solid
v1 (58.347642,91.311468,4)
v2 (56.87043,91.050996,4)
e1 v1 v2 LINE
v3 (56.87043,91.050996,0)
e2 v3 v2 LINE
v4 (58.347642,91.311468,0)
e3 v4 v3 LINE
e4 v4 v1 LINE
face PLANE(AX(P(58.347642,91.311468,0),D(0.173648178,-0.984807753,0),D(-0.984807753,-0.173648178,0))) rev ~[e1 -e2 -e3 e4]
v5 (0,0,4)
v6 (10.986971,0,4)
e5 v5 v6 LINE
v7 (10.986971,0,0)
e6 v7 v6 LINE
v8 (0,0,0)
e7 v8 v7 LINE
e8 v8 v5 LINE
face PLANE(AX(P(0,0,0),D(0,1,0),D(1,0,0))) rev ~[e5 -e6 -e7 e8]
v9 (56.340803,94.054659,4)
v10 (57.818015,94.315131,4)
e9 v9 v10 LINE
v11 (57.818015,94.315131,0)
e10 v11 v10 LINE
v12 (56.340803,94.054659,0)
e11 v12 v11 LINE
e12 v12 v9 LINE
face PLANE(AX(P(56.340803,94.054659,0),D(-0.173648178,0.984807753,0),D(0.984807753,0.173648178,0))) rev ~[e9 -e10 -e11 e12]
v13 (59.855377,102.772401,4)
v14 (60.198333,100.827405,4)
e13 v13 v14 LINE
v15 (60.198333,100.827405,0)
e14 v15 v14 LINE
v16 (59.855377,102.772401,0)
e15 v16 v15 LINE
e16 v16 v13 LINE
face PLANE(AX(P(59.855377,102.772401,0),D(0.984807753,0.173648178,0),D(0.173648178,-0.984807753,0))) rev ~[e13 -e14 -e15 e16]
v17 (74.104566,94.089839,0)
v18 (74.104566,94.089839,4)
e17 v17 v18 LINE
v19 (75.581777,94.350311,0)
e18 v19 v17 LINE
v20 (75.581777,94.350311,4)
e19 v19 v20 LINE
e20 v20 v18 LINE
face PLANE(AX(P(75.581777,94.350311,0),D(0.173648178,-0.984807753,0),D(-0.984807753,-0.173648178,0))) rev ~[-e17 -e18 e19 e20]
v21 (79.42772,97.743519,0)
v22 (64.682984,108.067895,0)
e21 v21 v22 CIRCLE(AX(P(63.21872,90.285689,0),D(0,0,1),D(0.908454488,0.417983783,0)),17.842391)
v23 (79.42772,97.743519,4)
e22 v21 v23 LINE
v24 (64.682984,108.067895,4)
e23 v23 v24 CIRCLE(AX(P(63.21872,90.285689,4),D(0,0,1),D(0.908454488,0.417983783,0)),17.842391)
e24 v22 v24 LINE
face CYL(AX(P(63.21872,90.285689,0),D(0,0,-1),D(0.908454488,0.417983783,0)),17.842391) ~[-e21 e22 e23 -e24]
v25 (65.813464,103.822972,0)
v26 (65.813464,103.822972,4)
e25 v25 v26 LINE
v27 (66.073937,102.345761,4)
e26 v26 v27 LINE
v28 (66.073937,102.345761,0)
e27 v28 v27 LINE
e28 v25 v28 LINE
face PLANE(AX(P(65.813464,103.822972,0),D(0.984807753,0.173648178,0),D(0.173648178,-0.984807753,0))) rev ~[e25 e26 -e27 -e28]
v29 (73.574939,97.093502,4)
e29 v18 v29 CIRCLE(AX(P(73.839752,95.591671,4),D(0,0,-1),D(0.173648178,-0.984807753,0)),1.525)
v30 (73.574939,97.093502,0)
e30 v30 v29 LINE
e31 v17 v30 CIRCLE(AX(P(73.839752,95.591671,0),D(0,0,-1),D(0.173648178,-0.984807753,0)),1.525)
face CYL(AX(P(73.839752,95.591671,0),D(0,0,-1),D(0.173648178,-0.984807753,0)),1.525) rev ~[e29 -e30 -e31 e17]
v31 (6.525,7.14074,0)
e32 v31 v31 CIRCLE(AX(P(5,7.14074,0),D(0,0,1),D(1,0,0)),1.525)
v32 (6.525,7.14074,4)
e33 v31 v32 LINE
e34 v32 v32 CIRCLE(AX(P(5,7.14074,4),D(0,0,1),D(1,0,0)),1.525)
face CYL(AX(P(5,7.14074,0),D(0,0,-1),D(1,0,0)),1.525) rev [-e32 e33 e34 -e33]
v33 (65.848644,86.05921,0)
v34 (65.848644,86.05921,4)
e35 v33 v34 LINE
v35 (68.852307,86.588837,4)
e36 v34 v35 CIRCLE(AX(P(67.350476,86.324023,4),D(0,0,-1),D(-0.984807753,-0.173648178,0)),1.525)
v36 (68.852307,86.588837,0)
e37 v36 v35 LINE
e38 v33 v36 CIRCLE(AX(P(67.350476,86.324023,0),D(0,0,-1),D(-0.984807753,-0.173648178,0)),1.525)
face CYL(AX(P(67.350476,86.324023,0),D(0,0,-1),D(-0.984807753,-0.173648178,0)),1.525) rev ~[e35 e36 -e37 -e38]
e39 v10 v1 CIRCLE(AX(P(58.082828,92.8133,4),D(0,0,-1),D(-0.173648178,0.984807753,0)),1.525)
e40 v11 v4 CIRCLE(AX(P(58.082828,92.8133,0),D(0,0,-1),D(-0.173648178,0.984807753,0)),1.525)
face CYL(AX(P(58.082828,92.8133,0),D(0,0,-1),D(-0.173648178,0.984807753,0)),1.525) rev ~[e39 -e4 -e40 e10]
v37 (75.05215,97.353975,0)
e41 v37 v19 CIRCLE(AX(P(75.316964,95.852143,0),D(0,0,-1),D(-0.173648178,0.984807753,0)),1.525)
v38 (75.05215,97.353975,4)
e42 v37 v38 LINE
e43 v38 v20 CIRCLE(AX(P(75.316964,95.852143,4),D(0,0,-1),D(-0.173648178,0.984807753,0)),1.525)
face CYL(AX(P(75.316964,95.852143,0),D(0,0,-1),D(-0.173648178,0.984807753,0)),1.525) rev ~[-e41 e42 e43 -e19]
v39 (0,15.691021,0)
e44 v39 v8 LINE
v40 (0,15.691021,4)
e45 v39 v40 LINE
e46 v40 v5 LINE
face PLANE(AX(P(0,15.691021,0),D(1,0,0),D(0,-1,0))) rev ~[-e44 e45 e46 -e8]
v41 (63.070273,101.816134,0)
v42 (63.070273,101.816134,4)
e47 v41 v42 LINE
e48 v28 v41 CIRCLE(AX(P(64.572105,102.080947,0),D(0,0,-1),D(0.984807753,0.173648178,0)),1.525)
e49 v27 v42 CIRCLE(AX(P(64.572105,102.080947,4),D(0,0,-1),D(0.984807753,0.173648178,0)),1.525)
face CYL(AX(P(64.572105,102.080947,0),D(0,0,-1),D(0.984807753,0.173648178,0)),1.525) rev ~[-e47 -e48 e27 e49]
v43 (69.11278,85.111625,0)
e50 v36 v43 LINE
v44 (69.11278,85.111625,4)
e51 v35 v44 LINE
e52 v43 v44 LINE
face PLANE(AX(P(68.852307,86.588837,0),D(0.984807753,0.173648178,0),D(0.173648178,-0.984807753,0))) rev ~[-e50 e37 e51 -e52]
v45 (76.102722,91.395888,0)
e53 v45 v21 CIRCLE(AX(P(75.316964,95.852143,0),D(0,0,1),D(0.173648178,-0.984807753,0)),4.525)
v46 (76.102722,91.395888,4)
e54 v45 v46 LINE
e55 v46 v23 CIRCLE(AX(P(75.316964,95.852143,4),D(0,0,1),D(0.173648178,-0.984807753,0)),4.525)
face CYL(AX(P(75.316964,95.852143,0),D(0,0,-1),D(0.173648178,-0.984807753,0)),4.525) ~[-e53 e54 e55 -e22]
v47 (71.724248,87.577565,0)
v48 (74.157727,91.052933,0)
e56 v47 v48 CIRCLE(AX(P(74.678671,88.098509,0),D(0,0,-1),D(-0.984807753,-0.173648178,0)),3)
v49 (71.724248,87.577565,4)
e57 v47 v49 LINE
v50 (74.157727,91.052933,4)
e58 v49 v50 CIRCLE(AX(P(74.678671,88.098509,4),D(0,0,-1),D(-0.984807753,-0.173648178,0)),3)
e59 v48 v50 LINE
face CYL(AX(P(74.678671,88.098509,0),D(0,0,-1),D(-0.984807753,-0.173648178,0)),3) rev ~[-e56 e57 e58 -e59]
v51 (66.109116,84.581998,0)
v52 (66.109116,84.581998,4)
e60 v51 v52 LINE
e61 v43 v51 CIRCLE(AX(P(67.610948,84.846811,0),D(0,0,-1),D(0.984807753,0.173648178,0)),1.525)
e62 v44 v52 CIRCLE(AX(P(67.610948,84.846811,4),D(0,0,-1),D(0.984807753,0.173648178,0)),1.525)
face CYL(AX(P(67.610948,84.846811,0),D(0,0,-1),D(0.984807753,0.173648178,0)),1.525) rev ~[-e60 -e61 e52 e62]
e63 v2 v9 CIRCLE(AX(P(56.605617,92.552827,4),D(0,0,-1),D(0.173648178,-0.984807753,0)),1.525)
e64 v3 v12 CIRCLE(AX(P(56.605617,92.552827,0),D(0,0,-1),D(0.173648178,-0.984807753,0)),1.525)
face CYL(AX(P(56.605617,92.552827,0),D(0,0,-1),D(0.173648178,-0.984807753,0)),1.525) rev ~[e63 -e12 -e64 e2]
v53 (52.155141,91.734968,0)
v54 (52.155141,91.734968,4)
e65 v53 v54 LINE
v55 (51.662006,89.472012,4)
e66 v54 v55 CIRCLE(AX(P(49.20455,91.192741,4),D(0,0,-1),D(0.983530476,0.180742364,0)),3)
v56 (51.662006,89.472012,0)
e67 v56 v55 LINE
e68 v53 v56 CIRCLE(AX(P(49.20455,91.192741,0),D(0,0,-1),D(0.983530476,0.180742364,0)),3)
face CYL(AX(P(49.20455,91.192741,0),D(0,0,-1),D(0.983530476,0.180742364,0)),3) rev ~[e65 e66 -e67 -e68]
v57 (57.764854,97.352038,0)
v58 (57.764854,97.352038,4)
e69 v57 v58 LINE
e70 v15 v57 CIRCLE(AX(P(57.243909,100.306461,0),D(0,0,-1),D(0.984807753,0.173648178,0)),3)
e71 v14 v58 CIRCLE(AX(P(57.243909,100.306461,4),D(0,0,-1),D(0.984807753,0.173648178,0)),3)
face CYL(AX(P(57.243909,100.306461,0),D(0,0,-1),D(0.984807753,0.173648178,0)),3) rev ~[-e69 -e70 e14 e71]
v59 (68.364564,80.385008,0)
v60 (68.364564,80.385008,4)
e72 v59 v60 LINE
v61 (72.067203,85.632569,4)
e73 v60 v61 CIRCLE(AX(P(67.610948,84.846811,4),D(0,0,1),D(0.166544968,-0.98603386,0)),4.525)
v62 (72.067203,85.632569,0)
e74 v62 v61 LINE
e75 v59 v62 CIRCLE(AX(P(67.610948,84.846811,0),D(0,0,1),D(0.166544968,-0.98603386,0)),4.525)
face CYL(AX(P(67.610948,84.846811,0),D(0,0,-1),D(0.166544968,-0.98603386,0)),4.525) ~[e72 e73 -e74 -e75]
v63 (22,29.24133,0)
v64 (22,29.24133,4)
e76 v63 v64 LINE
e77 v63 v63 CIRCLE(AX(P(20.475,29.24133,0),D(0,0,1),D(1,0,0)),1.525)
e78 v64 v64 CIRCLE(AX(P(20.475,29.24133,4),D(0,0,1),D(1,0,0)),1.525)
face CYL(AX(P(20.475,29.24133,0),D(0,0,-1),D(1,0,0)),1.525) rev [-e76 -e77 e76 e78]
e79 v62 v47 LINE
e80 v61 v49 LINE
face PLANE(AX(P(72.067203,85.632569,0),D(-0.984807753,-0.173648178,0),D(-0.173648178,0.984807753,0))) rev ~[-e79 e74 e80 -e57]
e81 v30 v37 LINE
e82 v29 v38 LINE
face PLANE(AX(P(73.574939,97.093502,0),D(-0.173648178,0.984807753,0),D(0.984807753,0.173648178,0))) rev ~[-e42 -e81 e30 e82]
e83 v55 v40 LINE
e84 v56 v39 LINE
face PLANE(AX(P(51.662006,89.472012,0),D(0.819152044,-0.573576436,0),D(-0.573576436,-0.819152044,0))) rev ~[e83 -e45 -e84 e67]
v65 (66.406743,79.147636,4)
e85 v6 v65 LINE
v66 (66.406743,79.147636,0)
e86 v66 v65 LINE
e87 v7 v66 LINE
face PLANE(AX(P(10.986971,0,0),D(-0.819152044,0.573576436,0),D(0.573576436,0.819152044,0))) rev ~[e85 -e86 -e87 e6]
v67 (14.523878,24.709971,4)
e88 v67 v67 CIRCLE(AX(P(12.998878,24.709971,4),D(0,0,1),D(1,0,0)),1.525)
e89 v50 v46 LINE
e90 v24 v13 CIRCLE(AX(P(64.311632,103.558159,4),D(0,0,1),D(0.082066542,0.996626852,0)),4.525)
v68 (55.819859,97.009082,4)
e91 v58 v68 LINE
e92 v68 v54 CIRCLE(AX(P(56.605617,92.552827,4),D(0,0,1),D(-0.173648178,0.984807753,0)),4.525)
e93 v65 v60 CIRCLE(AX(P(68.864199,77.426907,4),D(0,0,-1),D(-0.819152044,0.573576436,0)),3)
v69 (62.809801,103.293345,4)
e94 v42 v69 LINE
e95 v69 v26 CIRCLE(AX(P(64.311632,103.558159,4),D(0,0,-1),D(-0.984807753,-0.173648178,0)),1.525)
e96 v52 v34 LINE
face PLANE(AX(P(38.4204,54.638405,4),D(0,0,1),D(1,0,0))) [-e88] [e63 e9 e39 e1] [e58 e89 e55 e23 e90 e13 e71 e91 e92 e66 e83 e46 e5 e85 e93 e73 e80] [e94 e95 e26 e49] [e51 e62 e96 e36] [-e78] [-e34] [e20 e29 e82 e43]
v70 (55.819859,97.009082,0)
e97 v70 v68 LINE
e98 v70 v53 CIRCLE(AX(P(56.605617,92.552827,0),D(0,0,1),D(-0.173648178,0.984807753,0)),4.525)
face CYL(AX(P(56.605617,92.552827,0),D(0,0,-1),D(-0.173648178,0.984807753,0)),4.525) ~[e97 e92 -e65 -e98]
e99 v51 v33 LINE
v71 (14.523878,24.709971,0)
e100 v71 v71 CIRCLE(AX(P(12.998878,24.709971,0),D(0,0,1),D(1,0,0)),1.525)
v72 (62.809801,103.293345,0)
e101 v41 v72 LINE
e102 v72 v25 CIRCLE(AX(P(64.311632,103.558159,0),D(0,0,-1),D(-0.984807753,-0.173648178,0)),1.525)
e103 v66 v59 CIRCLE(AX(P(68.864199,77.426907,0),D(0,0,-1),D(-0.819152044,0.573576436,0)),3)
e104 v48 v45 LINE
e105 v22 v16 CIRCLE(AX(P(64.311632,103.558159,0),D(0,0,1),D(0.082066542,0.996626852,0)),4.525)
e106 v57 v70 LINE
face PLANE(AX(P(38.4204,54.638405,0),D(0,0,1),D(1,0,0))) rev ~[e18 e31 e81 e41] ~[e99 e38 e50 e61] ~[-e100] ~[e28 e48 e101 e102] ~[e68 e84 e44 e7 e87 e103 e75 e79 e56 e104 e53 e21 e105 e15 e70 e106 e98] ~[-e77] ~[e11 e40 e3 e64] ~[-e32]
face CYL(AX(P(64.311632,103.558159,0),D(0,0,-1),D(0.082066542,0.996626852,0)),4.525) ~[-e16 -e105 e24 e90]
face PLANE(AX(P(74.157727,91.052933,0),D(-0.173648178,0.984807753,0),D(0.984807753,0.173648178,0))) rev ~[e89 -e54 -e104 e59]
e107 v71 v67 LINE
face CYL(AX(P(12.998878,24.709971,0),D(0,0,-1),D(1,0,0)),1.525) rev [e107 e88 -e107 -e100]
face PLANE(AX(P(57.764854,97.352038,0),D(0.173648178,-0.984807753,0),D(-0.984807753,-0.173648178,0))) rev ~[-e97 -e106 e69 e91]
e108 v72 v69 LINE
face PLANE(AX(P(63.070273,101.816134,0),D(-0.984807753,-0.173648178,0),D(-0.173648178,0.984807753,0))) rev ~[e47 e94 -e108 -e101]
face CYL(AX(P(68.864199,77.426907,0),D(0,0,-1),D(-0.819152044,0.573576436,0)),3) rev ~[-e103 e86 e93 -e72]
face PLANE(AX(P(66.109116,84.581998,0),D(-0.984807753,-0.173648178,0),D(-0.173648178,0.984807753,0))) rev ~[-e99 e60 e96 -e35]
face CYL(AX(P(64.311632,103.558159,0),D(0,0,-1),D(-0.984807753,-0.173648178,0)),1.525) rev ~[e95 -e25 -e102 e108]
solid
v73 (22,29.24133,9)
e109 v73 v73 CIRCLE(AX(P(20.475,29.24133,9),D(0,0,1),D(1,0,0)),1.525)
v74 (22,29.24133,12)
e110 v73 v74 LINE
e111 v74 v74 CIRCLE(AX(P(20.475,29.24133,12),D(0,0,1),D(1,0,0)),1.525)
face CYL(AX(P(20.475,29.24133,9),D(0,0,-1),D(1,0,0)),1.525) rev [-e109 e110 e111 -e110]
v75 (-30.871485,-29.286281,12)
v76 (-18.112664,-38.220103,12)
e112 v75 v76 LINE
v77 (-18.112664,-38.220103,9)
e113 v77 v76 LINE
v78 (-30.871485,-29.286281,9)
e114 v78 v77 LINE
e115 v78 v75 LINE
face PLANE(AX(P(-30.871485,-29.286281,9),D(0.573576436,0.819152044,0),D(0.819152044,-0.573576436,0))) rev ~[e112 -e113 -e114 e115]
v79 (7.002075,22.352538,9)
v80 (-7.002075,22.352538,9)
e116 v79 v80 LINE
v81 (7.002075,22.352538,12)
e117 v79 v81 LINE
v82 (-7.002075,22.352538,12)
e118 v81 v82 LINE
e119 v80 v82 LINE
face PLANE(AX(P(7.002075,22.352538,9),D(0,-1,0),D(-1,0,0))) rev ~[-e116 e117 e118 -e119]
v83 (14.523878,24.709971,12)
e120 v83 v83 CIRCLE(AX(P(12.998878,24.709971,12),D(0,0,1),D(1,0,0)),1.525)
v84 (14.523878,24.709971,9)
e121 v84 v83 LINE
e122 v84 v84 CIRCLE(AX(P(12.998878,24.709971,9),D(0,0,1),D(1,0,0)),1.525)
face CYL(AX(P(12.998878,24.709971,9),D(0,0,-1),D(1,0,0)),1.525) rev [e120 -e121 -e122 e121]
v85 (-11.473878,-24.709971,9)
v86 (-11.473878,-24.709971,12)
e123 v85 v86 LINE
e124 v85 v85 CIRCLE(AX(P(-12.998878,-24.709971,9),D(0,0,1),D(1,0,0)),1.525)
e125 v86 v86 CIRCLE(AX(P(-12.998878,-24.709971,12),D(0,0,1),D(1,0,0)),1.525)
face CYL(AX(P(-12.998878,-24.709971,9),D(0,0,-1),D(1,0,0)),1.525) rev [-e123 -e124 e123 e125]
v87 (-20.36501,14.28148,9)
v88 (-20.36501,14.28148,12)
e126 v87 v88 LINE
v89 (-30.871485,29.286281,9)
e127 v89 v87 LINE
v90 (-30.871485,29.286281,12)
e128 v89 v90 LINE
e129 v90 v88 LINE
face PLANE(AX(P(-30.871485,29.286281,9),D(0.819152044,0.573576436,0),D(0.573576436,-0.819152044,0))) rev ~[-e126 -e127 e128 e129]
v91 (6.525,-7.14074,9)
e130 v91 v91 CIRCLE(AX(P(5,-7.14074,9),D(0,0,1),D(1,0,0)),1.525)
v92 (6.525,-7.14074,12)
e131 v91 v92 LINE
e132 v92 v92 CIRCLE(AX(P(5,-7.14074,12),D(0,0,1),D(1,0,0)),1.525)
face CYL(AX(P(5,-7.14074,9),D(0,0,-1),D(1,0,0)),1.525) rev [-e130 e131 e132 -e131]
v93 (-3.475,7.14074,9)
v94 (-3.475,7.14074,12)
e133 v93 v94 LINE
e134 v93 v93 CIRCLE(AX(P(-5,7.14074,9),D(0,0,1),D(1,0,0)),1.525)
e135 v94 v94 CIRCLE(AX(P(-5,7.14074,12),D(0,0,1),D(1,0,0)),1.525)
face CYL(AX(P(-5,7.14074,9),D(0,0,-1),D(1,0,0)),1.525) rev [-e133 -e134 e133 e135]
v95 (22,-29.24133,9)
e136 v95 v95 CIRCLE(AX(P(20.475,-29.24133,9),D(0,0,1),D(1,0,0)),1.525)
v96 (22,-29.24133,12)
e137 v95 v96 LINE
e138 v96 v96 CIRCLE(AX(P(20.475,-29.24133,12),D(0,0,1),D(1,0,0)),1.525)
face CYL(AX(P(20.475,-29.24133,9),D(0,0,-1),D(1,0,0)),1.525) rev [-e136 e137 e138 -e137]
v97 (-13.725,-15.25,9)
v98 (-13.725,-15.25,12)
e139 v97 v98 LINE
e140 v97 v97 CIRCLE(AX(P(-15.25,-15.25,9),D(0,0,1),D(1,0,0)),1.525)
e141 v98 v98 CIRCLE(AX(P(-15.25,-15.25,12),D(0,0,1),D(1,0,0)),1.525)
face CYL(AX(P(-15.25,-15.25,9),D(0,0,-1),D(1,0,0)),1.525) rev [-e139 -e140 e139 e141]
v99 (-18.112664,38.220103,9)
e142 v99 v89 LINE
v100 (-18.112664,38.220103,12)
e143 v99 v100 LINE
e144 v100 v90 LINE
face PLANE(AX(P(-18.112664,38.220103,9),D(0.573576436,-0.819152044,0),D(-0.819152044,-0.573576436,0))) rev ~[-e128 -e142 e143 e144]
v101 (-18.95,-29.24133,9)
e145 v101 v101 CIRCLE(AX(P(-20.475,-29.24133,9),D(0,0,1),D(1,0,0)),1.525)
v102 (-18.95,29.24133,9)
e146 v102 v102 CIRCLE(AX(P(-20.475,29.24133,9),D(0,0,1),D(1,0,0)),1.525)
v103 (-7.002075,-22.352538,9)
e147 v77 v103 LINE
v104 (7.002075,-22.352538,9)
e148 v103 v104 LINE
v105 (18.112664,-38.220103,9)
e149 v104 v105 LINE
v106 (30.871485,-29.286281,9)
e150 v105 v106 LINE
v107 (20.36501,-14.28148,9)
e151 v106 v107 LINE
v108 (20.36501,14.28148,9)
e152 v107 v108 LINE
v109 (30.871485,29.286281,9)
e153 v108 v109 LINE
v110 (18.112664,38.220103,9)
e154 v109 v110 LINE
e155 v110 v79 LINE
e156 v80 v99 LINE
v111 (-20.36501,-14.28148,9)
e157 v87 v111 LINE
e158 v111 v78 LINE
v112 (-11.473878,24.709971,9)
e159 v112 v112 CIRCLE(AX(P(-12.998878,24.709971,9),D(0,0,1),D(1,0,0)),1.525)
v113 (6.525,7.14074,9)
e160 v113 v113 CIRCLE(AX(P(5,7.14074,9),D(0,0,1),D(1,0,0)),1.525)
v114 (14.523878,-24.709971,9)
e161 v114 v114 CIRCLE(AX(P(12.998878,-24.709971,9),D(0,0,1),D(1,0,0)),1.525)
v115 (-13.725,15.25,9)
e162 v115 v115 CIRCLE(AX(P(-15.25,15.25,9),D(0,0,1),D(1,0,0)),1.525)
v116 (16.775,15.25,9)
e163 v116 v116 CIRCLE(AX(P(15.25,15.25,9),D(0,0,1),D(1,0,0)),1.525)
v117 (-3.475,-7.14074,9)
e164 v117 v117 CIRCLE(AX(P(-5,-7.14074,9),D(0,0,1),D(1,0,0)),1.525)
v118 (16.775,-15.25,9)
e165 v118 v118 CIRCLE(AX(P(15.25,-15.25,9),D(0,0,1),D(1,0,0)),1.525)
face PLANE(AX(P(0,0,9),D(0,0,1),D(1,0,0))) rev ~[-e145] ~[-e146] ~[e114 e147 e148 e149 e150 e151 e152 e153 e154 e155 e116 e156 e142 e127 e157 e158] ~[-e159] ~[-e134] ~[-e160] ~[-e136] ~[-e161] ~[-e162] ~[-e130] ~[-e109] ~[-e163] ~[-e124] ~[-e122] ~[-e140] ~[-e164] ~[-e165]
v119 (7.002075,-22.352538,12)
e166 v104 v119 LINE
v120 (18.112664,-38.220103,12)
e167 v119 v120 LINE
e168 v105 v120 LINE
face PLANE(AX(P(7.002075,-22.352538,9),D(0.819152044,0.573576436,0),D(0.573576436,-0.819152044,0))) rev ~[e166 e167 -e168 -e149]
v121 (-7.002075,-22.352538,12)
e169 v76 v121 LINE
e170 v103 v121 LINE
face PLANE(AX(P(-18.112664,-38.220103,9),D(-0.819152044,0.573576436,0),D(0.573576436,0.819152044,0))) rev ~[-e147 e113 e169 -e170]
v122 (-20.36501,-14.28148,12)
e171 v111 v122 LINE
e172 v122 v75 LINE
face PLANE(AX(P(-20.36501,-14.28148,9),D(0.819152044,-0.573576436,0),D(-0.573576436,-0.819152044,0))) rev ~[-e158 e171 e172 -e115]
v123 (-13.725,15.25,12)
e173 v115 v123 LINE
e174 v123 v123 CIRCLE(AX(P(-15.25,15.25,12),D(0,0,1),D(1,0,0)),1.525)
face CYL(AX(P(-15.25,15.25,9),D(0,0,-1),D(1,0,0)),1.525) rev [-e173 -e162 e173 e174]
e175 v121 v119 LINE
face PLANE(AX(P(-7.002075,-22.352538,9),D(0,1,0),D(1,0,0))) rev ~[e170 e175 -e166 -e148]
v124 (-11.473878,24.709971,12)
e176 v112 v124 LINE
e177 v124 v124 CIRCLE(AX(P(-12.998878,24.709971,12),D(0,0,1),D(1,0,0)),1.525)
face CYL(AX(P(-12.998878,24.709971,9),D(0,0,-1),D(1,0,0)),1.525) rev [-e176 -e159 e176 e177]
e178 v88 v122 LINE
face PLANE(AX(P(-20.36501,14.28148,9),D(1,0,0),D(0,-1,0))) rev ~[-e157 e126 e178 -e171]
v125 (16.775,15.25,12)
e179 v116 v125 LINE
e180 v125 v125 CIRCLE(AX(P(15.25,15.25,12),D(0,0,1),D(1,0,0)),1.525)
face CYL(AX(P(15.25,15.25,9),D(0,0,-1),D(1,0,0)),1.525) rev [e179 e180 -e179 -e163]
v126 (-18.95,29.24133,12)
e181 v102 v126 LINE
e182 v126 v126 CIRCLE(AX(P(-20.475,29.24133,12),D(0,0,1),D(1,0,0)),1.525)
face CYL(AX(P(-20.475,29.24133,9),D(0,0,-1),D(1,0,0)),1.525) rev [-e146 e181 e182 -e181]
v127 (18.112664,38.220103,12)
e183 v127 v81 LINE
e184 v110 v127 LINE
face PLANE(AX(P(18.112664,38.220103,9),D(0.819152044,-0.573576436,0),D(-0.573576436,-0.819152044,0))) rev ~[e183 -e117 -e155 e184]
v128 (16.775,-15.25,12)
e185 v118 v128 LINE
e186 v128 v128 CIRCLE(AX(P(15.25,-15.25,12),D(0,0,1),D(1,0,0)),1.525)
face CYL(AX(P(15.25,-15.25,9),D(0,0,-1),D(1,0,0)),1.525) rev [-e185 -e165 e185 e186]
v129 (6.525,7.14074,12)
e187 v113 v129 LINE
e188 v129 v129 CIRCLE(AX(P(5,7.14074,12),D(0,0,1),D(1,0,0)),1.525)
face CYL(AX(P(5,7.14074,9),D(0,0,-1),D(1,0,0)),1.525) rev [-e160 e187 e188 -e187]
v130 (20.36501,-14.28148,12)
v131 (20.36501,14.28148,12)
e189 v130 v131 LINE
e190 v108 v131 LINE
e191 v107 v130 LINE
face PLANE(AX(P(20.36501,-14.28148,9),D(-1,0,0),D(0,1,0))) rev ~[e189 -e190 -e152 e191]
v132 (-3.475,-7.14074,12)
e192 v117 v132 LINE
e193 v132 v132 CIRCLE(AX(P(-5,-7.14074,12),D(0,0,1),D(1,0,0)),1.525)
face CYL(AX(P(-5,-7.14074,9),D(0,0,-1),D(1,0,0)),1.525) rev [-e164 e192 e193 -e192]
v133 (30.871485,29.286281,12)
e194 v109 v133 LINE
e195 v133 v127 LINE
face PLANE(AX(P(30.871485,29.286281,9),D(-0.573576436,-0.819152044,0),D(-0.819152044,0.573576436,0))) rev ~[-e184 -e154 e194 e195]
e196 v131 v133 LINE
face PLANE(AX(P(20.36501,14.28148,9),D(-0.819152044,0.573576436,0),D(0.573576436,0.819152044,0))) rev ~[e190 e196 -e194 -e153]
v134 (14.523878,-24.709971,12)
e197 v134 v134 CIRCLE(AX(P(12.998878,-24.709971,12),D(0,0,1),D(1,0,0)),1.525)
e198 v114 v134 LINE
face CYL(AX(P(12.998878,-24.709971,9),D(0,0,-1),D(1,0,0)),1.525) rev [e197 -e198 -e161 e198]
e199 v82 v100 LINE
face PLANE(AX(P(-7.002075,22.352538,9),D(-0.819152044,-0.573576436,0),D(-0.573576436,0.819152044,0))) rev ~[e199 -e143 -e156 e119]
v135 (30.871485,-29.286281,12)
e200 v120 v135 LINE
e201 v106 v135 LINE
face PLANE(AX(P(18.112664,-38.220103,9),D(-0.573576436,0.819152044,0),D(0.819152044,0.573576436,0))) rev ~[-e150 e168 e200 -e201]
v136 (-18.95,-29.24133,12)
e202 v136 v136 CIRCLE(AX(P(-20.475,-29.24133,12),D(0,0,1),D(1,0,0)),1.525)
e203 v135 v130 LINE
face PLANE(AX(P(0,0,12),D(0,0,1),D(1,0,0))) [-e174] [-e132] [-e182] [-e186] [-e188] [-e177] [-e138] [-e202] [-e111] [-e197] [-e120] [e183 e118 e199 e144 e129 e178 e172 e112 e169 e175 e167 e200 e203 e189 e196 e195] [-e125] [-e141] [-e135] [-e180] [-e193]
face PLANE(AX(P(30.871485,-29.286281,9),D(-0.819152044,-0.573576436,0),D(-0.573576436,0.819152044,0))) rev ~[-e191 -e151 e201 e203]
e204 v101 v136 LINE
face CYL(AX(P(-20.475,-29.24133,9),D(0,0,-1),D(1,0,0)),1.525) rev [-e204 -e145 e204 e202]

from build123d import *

# Parameters (mm, degrees)
F0_R     = 1.525
F1_DEPTH = 4
F3_R     = 1.525
F4_DEPTH = 3


# Not quite as in the source:
# - a feature names something its author has since deleted; it is built from what else it names


with BuildPart() as f1:
    # F0 (on Top) → F1 (new body)
    with BuildSketch(Plane.XY):
        with BuildLine():
            Line((51.6620058257, 89.4720118049), (0, 15.6910211606))
            Line((0, 15.6910211606), (0, 0))
            Line((0, 0), (10.9869712989, 0))
            Line((10.9869712989, 0), (66.4067426229, 79.1476359506))
            ThreePointArc((66.4067426229, 79.1476359506), (67.261429469, 79.9628740335), (68.3645638504, 80.3850082222))
            ThreePointArc((68.3645638504, 80.3850082222), (71.3082325233, 82.2380356387), (72.0672029506, 85.6325694436))
            Line((72.0672029506, 85.6325694436), (71.7242477997, 87.5775647558))
            ThreePointArc((71.7242477997, 87.5775647558), (72.2212149259, 89.8192385978), (74.1577265257, 91.0529325478))
            Line((74.1577265257, 91.0529325478), (76.1027218379, 91.3958876987))
            ThreePointArc((76.1027218379, 91.3958876987), (79.3253389122, 93.7524870397), (79.4277203932, 97.743519399))
            ThreePointArc((79.4277203932, 97.743519399), (73.452695276, 104.9013203483), (64.682983596, 108.0678952533))
            ThreePointArc((64.682983596, 108.0678952533), (60.9676564674, 106.6066746716), (59.8553774102, 102.7724007429))
            Line((59.8553774102, 102.7724007429), (60.198332561, 100.8274054307))
            ThreePointArc((60.198332561, 100.8274054307), (59.7013654349, 98.5857315887), (57.764853835, 97.3520376387))
            Line((57.764853835, 97.3520376387), (55.8198585228, 97.0090824878))
            ThreePointArc((55.8198585228, 97.0090824878), (52.8896233297, 95.1348846394), (52.1551411217, 91.7349682069))
            ThreePointArc((52.1551411217, 91.7349682069), (52.1357589189, 90.5539825732), (51.6620058257, 89.4720118049))
        make_face()
        with Locations((5, 7.1407400337)):
            Circle(F0_R, mode=Mode.SUBTRACT)
        with Locations((12.9988775531, 24.7099710219)):
            Circle(F0_R, mode=Mode.SUBTRACT)
        with Locations((20.475, 29.241330438)):
            Circle(F0_R, mode=Mode.SUBTRACT)
        with BuildLine():
            Line((56.3408030558, 94.0546592287), (57.8180146853, 94.3151314952))
            ThreePointArc((57.8180146853, 94.3151314952), (59.5846599796, 93.0781131428), (58.3476416272, 91.3114678486))
            Line((58.3476416272, 91.3114678486), (56.8704299977, 91.0509955821))
            ThreePointArc((56.8704299977, 91.0509955821), (55.1037847034, 92.2880139345), (56.3408030558, 94.0546592287))
        make_face(mode=Mode.SUBTRACT)
        with BuildLine():
            Line((66.1091160449, 84.5819979687), (65.8486437784, 86.0592095982))
            ThreePointArc((65.8486437784, 86.0592095982), (67.0856621308, 87.8258548925), (68.852307425, 86.5888365401))
            Line((68.852307425, 86.5888365401), (69.1127796915, 85.1116249106))
            ThreePointArc((69.1127796915, 85.1116249106), (67.8757613391, 83.3449796163), (66.1091160449, 84.5819979687))
        make_face(mode=Mode.SUBTRACT)
        with BuildLine():
            ThreePointArc((66.0739365824, 102.3457605883), (64.83691823, 100.579115294), (63.0702729357, 101.8161336464))
            Line((63.0702729357, 101.8161336464), (62.8098006692, 103.2933452759))
            ThreePointArc((62.8098006692, 103.2933452759), (64.0468190216, 105.0599905702), (65.8134643159, 103.8229722178))
            Line((65.8134643159, 103.8229722178), (66.0739365824, 102.3457605883))
        make_face(mode=Mode.SUBTRACT)
        with BuildLine():
            ThreePointArc((74.1045656754, 94.0898386912), (72.3379203811, 95.3268570436), (73.5749387335, 97.0935023379))
            Line((73.5749387335, 97.0935023379), (75.052150363, 97.3539746044))
            ThreePointArc((75.052150363, 97.3539746044), (76.8187956573, 96.116956252), (75.5817773049, 94.3503109577))
            Line((75.5817773049, 94.3503109577), (74.1045656754, 94.0898386912))
        make_face(mode=Mode.SUBTRACT)
    extrude(amount=F1_DEPTH)


with BuildPart() as f4:
    # F3 (on offset) → F4 (new body)
    with BuildSketch(Plane.XY.offset(9)):
        Polygon((30.8714845867, 29.2862810921), (18.1126643716, 38.2201031854), (7.0020753821, 22.3525376663), (0, 22.3525376663), (-7.0020753821, 22.3525376663), (-18.1126643716, 38.2201031854), (-30.8714845867, 29.2862810921), (-20.3650097999, 14.2814800674), (-20.3650097999, 0), (-20.3650097999, -14.2814800674), (-30.8714845867, -29.2862810921), (-18.1126643716, -38.2201031854), (-7.0020753821, -22.3525376663), (0, -22.3525376663), (7.0020753821, -22.3525376663), (18.1126643716, -38.2201031854), (30.8714845867, -29.2862810921), (20.3650097999, -14.2814800674), (20.3650097999, 0), (20.3650097999, 14.2814800674), align=None)
        with Locations((-20.475, -29.241330438)):
            Circle(F3_R, mode=Mode.SUBTRACT)
        with Locations((-12.9988775531, -24.7099710219)):
            Circle(F3_R, mode=Mode.SUBTRACT)
        with Locations((-15.25, -15.25)):
            Circle(F3_R, mode=Mode.SUBTRACT)
        with Locations((-5, -7.1407400337)):
            Circle(F3_R, mode=Mode.SUBTRACT)
        with Locations((12.9988775531, -24.7099710219)):
            Circle(F3_R, mode=Mode.SUBTRACT)
        with Locations((20.475, -29.241330438)):
            Circle(F3_R, mode=Mode.SUBTRACT)
        with Locations((15.25, -15.25)):
            Circle(F3_R, mode=Mode.SUBTRACT)
        with Locations((5, -7.1407400337)):
            Circle(F3_R, mode=Mode.SUBTRACT)
        with Locations((-5, 7.1407400337)):
            Circle(F3_R, mode=Mode.SUBTRACT)
        with Locations((-15.25, 15.25)):
            Circle(F3_R, mode=Mode.SUBTRACT)
        with Locations((-20.475, 29.241330438)):
            Circle(F3_R, mode=Mode.SUBTRACT)
        with Locations((-12.9988775531, 24.7099710219)):
            Circle(F3_R, mode=Mode.SUBTRACT)
        with Locations((5, 7.1407400337)):
            Circle(F3_R, mode=Mode.SUBTRACT)
        with Locations((15.25, 15.25)):
            Circle(F3_R, mode=Mode.SUBTRACT)
        with Locations((12.9988775531, 24.7099710219)):
            Circle(F3_R, mode=Mode.SUBTRACT)
        with Locations((20.475, 29.241330438)):
            Circle(F3_R, mode=Mode.SUBTRACT)
    extrude(amount=F4_DEPTH)


solid = Compound([f1.part, f4.part])
